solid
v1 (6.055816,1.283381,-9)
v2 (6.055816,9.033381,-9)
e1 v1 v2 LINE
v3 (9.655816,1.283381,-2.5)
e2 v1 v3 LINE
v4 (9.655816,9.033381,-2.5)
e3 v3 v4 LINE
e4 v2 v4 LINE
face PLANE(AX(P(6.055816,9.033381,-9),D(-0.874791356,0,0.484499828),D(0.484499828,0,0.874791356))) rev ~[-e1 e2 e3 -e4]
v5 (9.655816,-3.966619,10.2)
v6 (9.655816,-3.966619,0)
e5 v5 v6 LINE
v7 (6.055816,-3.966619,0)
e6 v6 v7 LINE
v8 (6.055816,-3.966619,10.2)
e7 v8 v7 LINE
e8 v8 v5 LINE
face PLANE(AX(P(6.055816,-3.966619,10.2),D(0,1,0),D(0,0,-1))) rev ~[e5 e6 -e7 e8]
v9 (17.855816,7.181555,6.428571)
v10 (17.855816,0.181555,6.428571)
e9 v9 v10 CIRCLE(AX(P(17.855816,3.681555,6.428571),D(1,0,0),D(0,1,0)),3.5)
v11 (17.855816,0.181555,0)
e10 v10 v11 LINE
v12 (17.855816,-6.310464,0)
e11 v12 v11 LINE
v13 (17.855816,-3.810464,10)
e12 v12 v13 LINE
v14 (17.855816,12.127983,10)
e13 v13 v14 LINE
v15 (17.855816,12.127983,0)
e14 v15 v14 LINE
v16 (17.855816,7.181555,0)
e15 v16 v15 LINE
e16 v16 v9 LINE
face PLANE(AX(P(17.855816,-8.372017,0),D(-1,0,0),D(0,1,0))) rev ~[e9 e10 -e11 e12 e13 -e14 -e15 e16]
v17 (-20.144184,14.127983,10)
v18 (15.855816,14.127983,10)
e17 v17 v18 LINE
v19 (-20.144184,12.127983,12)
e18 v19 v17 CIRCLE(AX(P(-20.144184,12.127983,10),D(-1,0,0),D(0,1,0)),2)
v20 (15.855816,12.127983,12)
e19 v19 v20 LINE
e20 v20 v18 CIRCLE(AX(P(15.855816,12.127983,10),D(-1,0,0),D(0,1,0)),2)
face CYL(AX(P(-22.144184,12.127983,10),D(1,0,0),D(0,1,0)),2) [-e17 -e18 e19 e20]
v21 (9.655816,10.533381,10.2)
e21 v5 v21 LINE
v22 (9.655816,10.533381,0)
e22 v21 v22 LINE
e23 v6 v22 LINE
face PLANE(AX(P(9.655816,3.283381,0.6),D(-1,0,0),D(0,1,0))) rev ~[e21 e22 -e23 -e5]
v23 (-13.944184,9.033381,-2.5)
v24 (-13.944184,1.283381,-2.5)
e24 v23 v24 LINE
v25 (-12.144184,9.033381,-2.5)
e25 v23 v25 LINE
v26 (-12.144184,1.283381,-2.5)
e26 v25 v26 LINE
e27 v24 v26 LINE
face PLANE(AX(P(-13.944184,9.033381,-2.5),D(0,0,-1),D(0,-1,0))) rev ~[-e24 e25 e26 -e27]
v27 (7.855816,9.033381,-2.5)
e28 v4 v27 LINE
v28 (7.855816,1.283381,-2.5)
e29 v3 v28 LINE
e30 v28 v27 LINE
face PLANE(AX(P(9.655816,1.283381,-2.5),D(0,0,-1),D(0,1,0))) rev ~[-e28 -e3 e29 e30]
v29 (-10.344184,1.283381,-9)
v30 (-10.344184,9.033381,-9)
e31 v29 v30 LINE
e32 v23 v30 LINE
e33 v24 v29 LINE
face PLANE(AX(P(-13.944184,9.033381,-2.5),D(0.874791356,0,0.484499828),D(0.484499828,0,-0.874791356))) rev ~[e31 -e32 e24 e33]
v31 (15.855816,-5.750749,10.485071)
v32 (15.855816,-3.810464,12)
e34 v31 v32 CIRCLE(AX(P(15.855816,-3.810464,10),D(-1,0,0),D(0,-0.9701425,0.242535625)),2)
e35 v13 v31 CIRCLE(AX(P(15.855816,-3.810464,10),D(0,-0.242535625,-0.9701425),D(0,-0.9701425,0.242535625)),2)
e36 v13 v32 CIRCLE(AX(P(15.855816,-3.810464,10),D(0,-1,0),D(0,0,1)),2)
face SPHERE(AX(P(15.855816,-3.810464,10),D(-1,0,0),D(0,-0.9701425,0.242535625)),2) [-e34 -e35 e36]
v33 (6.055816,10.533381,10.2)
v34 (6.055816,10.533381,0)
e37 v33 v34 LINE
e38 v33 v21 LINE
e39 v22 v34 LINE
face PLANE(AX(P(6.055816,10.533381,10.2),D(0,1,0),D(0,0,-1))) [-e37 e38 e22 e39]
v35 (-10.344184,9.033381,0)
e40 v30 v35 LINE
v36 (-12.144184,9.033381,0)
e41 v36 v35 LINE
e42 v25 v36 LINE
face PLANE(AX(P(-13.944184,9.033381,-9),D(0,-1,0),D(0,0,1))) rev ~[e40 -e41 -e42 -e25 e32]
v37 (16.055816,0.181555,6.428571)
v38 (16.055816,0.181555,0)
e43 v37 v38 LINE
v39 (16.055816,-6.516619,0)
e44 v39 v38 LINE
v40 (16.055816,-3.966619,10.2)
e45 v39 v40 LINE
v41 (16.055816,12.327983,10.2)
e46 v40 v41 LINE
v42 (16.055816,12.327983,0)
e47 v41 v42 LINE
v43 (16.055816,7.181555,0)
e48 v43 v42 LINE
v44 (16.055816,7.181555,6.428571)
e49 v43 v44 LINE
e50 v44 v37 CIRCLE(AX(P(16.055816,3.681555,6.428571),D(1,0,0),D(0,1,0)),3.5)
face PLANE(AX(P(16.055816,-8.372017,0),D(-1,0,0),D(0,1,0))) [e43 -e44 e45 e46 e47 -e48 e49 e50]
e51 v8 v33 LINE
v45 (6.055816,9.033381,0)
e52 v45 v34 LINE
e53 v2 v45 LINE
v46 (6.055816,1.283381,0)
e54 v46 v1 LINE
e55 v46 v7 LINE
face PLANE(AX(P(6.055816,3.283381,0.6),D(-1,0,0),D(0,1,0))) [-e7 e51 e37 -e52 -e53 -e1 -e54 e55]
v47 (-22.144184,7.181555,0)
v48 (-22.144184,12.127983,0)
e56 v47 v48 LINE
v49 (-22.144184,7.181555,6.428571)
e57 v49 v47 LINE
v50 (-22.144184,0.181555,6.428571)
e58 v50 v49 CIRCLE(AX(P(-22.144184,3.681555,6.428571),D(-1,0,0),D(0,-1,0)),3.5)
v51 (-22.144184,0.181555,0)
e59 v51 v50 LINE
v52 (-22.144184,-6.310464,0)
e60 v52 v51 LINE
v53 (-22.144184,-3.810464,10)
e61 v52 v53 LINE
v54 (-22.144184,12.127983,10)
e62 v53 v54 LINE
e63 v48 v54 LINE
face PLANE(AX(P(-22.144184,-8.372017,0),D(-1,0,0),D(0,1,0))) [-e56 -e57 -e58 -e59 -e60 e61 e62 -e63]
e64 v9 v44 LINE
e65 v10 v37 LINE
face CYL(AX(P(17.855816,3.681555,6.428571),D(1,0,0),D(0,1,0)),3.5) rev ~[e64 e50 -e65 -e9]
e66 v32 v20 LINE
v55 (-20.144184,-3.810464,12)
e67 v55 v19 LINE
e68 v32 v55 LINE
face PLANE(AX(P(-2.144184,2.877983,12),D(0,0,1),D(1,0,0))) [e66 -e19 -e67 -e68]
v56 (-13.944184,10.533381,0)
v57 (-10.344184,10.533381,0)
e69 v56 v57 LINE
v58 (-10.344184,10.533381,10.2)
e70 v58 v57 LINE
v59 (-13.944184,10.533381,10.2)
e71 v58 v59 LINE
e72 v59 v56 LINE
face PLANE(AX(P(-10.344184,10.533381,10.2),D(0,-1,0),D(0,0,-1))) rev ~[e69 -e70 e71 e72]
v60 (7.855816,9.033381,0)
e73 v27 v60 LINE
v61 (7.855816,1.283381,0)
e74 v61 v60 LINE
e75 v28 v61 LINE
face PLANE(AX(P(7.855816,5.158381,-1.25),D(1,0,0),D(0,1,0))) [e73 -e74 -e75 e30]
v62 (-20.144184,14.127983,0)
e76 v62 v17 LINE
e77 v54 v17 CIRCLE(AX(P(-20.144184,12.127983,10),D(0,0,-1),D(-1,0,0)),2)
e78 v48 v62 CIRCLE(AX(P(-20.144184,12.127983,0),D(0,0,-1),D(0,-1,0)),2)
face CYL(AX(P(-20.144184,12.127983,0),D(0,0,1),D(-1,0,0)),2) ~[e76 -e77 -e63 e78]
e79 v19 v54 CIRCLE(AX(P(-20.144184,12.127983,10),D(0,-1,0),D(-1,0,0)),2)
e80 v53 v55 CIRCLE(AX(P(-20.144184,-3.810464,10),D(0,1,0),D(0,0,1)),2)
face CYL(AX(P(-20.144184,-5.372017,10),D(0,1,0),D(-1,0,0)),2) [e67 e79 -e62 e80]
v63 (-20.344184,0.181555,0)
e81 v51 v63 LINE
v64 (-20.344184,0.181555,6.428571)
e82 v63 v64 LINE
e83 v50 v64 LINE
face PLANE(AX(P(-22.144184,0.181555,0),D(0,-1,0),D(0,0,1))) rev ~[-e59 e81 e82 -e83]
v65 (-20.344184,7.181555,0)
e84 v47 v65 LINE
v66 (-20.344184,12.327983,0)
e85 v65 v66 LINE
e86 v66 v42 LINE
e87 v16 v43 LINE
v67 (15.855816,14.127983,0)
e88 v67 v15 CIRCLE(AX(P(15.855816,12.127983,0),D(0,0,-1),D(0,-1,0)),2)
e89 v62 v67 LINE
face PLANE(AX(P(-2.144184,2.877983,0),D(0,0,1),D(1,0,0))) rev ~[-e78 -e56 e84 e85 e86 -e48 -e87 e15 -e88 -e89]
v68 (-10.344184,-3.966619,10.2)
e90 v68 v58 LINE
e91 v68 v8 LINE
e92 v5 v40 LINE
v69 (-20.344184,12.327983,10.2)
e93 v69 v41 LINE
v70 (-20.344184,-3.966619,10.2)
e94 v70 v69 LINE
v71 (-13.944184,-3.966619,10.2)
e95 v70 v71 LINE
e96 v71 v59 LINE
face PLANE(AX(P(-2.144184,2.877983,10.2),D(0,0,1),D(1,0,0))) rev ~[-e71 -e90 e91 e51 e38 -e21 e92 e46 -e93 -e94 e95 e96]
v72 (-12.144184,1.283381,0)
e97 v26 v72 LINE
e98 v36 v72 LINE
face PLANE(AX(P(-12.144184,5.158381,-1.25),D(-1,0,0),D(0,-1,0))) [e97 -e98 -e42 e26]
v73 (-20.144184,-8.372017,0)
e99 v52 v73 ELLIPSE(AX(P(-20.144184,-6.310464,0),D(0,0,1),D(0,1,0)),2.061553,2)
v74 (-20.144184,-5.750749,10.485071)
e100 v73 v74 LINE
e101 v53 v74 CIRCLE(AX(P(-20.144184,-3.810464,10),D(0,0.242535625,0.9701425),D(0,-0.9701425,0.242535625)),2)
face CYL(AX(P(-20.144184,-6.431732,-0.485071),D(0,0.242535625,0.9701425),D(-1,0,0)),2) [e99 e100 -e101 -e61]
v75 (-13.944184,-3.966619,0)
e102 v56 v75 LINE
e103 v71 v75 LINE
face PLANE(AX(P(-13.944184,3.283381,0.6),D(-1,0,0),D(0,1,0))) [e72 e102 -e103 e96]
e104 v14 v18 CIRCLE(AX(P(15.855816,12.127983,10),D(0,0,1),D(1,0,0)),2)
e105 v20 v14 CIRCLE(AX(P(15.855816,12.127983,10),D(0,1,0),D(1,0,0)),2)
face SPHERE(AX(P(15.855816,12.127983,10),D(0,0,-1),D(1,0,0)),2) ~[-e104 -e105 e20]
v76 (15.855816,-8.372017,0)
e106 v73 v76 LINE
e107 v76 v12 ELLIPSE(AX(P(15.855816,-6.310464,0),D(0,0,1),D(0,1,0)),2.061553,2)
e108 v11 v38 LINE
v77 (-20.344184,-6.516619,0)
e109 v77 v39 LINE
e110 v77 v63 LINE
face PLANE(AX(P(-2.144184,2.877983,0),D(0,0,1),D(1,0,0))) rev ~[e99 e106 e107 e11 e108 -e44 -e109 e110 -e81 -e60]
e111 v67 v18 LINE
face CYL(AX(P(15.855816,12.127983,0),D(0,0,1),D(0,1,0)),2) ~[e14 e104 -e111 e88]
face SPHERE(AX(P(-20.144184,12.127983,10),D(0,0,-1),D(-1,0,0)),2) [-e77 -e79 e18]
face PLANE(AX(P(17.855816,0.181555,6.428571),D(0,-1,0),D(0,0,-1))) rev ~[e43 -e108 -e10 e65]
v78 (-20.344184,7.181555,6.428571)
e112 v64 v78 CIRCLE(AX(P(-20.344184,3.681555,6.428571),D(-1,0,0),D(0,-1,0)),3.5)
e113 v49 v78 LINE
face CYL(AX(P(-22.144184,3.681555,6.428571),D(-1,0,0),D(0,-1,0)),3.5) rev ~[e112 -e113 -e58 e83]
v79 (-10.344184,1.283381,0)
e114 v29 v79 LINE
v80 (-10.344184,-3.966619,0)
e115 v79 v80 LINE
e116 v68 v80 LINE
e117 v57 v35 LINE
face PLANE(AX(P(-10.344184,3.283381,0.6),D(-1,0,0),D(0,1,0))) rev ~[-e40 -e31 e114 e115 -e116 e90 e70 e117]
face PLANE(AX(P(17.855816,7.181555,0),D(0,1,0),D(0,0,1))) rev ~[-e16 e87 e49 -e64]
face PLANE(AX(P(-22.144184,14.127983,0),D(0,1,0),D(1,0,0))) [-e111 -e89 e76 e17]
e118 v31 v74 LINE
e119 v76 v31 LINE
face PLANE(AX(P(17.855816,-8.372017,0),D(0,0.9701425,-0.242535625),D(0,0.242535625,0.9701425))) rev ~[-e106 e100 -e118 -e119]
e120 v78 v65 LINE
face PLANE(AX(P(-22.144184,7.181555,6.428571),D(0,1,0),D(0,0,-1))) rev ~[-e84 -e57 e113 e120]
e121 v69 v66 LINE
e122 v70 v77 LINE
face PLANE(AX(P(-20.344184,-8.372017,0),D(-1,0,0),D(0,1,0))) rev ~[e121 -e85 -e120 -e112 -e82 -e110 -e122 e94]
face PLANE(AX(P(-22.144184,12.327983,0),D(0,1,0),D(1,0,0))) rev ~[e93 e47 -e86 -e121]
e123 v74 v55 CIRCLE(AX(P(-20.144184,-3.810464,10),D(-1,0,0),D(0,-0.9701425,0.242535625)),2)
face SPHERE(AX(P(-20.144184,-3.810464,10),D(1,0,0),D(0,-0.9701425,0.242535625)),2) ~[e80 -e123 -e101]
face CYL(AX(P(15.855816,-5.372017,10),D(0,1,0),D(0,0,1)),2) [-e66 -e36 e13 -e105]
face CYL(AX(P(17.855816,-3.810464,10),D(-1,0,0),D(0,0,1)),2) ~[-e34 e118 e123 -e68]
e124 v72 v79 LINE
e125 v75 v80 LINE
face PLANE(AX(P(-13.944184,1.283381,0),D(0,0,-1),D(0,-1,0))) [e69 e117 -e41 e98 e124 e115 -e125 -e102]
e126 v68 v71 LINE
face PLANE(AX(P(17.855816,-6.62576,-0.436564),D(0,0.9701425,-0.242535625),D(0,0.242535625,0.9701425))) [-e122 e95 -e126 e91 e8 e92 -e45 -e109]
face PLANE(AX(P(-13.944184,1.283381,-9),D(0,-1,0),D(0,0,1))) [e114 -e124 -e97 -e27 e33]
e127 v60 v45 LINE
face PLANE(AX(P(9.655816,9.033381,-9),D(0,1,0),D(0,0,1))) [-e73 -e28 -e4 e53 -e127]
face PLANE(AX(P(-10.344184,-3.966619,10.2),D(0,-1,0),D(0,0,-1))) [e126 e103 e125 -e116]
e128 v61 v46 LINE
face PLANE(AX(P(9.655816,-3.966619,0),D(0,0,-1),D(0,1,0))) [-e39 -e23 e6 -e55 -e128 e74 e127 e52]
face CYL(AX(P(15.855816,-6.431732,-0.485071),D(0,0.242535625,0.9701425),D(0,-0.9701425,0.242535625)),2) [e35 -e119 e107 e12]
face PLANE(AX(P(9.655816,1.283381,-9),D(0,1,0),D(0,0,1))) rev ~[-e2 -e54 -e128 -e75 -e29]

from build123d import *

# Parameters (mm, degrees)
F0_W      = 40
F0_H      = 22.5
F1_DEPTH  = 12
F3_DEPTH  = 40
F4_T      = -1.8
F6_E4_W   = 14.5
F6_E4_H   = 19.2
F7_DEPTH  = 3.6
F8_E5_W   = 14.5
F8_E5_H   = 19.2
F9_DEPTH  = 3.6
F10_W     = 5.25
F10_H     = 9
F11_DEPTH = 3.7
F12_W     = 5.25
F12_H     = 9
F13_DEPTH = 3.7
F14_W     = 1.5
F14_H     = 9
F15_DEPTH = 3.6
F16_W     = 1.5
F16_H     = 9
F17_DEPTH = 3.6
F18_W     = 7.75
F18_H     = 2.5
F19_DEPTH = 1.8
F20_W     = 7.75
F20_H     = 2.5
F21_DEPTH = 1.8
F23_DEPTH = 7.75
F25_DEPTH = 7.75
F27_DEPTH = 1.8
F29_DEPTH = 1.8
F30_R     = 2


with BuildPart() as f1:
    # F0 (on Top) → F1 (new body)
    with BuildSketch(Plane.XY):
        with Locations((-2.1441839635, 2.8779831225)):
            Rectangle(F0_W, F0_H)
    extrude(amount=F1_DEPTH)

    # F2 (on face) → F3 (cut)
    with BuildSketch(Plane.YZ.offset(17.8558160365)):
        Polygon((-8.3720168775, 12), (-8.3720168775, 0), (-5.3720168775, 12), align=None)
    extrude(amount=-F3_DEPTH, mode=Mode.SUBTRACT)

    # F4
    f4_openings = [f1.faces().sort_by_distance(p)[0] for p in [
        (-2.144184, 2.877983, 0),
    ]]
    offset(amount=F4_T, openings=f4_openings)

    # F6_E4 (on explicit) → F7 (join)
    with BuildSketch(Plane(origin=(-10.3441839635, -3.966619346, 10.2), x_dir=(0, 1, 0), z_dir=(-1, 0, 0))):
        with Locations((7.25, 9.6)):
            Rectangle(F6_E4_W, F6_E4_H)
    extrude(amount=F7_DEPTH)

    # F8_E5 (on explicit) → F9 (join)
    with BuildSketch(Plane(origin=(6.0558160365, -3.966619346, 10.2), x_dir=(0, 1, 0), z_dir=(-1, 0, 0))):
        with Locations((7.25, 9.6)):
            Rectangle(F8_E5_W, F8_E5_H)
    extrude(amount=-F9_DEPTH)

    # F10 (on face) → F11 (cut)
    with BuildSketch(Plane.YZ.offset(9.6558160365)):
        with Locations((-1.341619346, -4.5)):
            Rectangle(F10_W, F10_H)
    extrude(amount=-F11_DEPTH, mode=Mode.SUBTRACT)

    # F12 (on face) → F13 (cut)
    with BuildSketch(Plane(origin=(-13.9441839635, 0, 0), x_dir=(0, -1, 0), z_dir=(-1, 0, 0))):
        with Locations((1.341619346, -4.5)):
            Rectangle(F12_W, F12_H)
    extrude(amount=-F13_DEPTH, mode=Mode.SUBTRACT)

    # F14 (on face) → F15 (cut)
    with BuildSketch(Plane.YZ.offset(9.6558160365)):
        with Locations((9.783380654, -4.5)):
            Rectangle(F14_W, F14_H)
    extrude(amount=-F15_DEPTH, mode=Mode.SUBTRACT)

    # F16 (on face) → F17 (cut)
    with BuildSketch(Plane(origin=(-13.9441839635, 0, 0), x_dir=(0, -1, 0), z_dir=(-1, 0, 0))):
        with Locations((-9.783380654, -4.5)):
            Rectangle(F16_W, F16_H)
    extrude(amount=-F17_DEPTH, mode=Mode.SUBTRACT)

    # F18 (on face) → F19 (cut)
    with BuildSketch(Plane(origin=(-13.9441839635, 0, 0), x_dir=(0, -1, 0), z_dir=(-1, 0, 0))):
        with Locations((-5.158380654, -1.25)):
            Rectangle(F18_W, F18_H)
    extrude(amount=-F19_DEPTH, mode=Mode.SUBTRACT)

    # F20 (on face) → F21 (cut)
    with BuildSketch(Plane.YZ.offset(9.6558160365)):
        with Locations((5.158380654, -1.25)):
            Rectangle(F20_W, F20_H)
    extrude(amount=-F21_DEPTH, mode=Mode.SUBTRACT)

    # F22 (on face) → F23 (cut)
    with BuildSketch(Plane(origin=(0, 9.033380654, 0), x_dir=(-1, 0, 0), z_dir=(0, 1, 0))):
        Polygon((-6.0558160365, -9), (-9.6558160365, -2.5), (-9.6558160365, -9), align=None)
    extrude(amount=-F23_DEPTH, mode=Mode.SUBTRACT)

    # F24 (on face) → F25 (cut)
    with BuildSketch(Plane(origin=(0, 9.033380654, 0), x_dir=(-1, 0, 0), z_dir=(0, 1, 0))):
        Polygon((13.9441839635, -9), (13.9441839635, -2.5), (10.3441839635, -9), align=None)
    extrude(amount=-F25_DEPTH, mode=Mode.SUBTRACT)

    # F26 (on face) → F27 (cut)
    with BuildSketch(Plane(origin=(-22.1441839635, 0, 0), x_dir=(0, -1, 0), z_dir=(-1, 0, 0))):
        with BuildLine():
            Line((-0.1815545511, 0), (-0.1815545511, 6.4285714286))
            ThreePointArc((-0.1815545511, 6.4285714286), (-3.6815545511, 2.9285714286), (-7.1815545511, 6.4285714286))
            Line((-7.1815545511, 6.4285714286), (-7.1815545511, 0))
            Line((-7.1815545511, 0), (-0.1815545511, 0))
        make_face()
        with BuildLine():
            ThreePointArc((-7.1815545511, 6.4285714286), (-3.6815545511, 2.9285714286), (-0.1815545511, 6.4285714286))
            ThreePointArc((-0.1815545511, 6.4285714286), (-3.6815545511, 9.9285714286), (-7.1815545511, 6.4285714286))
        make_face()
    extrude(amount=-F27_DEPTH, mode=Mode.SUBTRACT)

    # F28 (on face) → F29 (cut)
    with BuildSketch(Plane.YZ.offset(17.8558160365)):
        with BuildLine():
            ThreePointArc((0.1815545511, 6.4285714286), (3.6815545511, 2.9285714286), (7.1815545511, 6.4285714286))
            ThreePointArc((7.1815545511, 6.4285714286), (3.6815545511, 9.9285714286), (0.1815545511, 6.4285714286))
        make_face()
        with BuildLine():
            Line((7.1815545511, 0), (7.1815545511, 6.4285714286))
            ThreePointArc((7.1815545511, 6.4285714286), (3.6815545511, 2.9285714286), (0.1815545511, 6.4285714286))
            Line((0.1815545511, 6.4285714286), (0.1815545511, 0))
            Line((0.1815545511, 0), (7.1815545511, 0))
        make_face()
    extrude(amount=-F29_DEPTH, mode=Mode.SUBTRACT)

    # F30
    f30_edges = [f1.edges().sort_by_distance(p)[0] for p in [
        (17.855816, -6.872017, 6),
        (17.855816, 14.127983, 6),
        (17.855816, 4.377983, 12),
        (-22.144184, -6.872017, 6),
        (-22.144184, 14.127983, 6),
        (-22.144184, 4.377983, 12),
        (-2.144184, -5.372017, 12),
        (-2.144184, 14.127983, 12),
    ]]
    fillet(f30_edges, radius=F30_R)


solid = f1.part
